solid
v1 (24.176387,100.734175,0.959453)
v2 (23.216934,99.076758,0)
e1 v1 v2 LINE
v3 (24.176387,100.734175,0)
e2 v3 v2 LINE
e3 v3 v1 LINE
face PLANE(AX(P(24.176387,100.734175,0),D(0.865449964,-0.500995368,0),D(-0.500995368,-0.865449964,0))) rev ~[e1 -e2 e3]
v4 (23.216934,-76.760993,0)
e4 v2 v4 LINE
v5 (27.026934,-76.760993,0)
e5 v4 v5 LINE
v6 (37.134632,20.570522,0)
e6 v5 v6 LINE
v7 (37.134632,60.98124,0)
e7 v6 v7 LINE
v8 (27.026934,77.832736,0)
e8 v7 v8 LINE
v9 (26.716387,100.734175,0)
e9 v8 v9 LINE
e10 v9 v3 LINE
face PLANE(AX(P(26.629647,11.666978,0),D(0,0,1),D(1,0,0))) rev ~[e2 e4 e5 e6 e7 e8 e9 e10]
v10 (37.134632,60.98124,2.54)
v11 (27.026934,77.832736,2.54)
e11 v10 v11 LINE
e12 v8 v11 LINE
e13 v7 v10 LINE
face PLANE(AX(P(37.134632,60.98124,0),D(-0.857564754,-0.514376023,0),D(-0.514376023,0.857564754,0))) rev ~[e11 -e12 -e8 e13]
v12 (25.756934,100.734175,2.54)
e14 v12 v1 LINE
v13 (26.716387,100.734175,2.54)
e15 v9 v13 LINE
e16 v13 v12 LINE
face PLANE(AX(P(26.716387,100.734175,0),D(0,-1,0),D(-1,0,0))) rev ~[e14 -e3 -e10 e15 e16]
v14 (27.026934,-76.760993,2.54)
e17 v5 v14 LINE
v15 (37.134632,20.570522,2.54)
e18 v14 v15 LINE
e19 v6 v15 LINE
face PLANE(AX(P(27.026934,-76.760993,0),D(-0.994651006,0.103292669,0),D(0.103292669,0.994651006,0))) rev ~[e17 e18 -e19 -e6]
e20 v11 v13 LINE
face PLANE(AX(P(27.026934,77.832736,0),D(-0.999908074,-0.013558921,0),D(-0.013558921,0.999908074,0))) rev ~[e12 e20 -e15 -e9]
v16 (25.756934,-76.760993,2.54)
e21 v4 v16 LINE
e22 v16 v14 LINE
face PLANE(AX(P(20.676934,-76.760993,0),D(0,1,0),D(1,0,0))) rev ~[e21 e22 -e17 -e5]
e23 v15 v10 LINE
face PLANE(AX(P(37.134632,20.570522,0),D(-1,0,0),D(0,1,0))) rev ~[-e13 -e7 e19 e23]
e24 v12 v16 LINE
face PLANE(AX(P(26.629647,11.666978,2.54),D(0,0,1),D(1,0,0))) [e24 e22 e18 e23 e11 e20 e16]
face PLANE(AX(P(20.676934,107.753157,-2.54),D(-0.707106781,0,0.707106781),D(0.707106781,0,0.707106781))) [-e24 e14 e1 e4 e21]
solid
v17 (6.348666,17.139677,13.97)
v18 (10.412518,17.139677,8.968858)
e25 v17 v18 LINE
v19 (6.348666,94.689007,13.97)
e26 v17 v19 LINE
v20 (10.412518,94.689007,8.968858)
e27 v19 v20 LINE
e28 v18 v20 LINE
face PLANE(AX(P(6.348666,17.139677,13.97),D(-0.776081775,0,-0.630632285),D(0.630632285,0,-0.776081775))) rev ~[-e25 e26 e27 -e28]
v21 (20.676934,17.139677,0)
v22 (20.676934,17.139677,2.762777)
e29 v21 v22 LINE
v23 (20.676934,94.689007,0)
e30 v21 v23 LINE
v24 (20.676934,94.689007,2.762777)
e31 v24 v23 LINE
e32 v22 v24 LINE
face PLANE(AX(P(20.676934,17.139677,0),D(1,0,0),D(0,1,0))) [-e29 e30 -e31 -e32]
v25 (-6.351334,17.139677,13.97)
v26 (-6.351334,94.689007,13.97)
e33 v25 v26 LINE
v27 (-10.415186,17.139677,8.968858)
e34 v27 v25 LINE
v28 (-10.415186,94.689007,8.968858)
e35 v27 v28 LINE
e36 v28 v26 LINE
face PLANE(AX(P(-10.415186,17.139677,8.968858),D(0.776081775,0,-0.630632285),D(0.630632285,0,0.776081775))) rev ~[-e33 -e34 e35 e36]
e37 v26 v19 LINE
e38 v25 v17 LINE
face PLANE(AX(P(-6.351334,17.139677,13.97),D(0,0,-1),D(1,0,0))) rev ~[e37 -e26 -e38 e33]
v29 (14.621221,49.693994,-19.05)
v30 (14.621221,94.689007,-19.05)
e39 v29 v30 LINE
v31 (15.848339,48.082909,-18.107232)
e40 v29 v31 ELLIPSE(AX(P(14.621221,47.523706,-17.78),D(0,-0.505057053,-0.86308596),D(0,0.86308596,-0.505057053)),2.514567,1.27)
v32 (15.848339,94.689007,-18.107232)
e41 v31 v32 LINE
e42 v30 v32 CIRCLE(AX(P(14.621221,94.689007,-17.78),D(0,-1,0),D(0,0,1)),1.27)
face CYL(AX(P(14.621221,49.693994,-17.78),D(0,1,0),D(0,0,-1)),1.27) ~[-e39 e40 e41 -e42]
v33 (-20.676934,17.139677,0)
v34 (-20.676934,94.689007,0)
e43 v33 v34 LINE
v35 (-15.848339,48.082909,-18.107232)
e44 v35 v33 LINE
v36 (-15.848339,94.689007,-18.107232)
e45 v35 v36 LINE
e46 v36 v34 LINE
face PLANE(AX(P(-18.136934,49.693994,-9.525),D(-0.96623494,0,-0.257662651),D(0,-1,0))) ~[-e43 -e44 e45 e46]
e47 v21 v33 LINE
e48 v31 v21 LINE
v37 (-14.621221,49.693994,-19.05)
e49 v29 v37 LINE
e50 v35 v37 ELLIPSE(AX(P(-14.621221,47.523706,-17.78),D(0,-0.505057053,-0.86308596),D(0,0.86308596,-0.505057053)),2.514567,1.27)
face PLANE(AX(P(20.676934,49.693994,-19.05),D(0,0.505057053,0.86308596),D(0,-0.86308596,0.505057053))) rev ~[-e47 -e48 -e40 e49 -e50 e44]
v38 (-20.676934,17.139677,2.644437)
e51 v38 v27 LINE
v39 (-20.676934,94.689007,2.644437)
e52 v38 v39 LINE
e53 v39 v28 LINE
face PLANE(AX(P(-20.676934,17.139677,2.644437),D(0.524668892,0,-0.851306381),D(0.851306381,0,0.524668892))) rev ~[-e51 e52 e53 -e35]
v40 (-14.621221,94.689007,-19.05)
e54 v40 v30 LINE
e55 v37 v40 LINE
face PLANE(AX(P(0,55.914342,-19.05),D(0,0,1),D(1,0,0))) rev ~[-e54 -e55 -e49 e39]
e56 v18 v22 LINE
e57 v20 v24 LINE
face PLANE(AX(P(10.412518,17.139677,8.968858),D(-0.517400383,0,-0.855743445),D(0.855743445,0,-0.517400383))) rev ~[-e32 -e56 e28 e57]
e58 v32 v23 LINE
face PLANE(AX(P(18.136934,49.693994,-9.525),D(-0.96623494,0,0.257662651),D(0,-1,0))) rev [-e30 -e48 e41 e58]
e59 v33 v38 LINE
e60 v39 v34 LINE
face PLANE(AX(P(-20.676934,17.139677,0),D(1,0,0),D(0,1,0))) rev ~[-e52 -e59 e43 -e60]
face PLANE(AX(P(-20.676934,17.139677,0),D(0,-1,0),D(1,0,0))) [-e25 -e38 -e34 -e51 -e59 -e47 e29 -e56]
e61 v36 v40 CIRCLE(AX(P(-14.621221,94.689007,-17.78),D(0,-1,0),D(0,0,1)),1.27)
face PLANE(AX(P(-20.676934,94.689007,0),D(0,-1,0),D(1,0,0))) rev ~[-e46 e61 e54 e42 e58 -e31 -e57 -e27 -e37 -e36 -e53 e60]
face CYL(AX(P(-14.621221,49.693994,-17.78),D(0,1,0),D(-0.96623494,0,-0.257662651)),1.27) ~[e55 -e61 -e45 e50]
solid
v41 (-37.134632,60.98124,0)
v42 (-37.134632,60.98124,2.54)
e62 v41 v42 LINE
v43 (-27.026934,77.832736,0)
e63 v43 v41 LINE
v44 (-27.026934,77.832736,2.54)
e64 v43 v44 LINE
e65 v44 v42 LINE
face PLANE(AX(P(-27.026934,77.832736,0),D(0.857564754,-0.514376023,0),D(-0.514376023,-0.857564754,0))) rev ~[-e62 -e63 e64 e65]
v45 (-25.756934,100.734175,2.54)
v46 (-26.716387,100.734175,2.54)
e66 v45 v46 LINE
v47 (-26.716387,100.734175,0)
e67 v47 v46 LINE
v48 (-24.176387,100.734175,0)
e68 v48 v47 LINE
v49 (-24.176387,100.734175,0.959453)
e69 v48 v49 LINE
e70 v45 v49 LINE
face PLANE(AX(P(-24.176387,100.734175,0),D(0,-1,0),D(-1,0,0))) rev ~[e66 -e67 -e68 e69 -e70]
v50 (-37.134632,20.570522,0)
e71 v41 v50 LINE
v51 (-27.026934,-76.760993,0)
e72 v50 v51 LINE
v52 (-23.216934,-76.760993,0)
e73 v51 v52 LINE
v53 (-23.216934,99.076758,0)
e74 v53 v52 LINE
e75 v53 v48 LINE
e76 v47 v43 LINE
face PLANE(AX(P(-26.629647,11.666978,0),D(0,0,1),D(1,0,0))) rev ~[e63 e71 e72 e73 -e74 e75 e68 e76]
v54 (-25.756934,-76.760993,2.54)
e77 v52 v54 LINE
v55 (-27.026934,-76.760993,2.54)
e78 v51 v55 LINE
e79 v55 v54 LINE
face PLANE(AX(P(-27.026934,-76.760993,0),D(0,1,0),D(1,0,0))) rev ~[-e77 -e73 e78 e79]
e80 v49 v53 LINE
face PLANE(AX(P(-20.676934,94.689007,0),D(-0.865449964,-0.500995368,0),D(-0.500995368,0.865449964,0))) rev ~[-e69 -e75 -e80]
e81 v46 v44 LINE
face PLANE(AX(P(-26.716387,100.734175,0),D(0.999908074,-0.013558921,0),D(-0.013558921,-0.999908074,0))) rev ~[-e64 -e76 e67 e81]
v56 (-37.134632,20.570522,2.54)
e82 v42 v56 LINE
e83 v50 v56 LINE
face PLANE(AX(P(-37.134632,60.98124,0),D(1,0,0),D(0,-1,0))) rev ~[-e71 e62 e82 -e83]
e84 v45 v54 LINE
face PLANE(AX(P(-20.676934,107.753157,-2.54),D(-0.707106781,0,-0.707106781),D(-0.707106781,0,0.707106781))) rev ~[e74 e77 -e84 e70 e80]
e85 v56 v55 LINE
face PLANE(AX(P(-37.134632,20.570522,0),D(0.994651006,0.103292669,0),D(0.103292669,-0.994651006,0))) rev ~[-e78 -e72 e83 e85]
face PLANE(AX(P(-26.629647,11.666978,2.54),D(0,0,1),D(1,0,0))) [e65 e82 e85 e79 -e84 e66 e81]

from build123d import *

# Parameters (mm, degrees)
F1_DEPTH       = 2.54
F2_W           = 41.3538680857
F2_H           = 77.5493303561
F3_DEPTH       = 19.05
F5_DEPTH       = 41.656
F6_SIZE2       = 19.05
F6_SIZE        = 5.08
F7_R           = 1.27
F9_DEPTH       = 83.595498357
F10_T1_DEPTH   = 197.5782991577
F10_2_T1_DEPTH = 197.5782991577


# Not quite as in the source:
# - a fillet or chamfer that OpenCascade refuses, or shapes differently, is made with other operations: its cross-section is extruded or revolved along the edge and cut away or added


with BuildPart() as f1:
    # F0 (on Top) → F1 (new body)
    with BuildSketch(Plane.XY):
        Polygon((-37.1346319619, 20.5705222299), (-27.0269340429, -76.7609926856), (-20.6769340429, -76.7609926856), (-20.6769340429, 94.6890073144), (-24.1763866916, 100.7341753154), (-26.7163866916, 100.7341753154), (-27.0269340429, 77.8327360749), (-37.1346319619, 60.9812401235), align=None)
    extrude(amount=F1_DEPTH)

    # F10#2: chamfer of 5.08 on 1 edges, made by hand

    # F10_2_s2 → F10_2_t1 (cut)
    with BuildSketch(Plane.XZ.offset(-107.7531568933)):
        Polygon((-20.6769340429, -2.54), (-25.7569340429, 2.54), (-20.6769340429, 2.54), align=None)
    extrude(amount=F10_2_T1_DEPTH, mode=Mode.SUBTRACT)


with BuildPart() as f1b:
    # F0 (on Top) → F1, piece 2 (new body)
    with BuildSketch(Plane.XY):
        Polygon((27.0269340429, 77.8327360749), (26.7163866916, 100.7341753154), (24.1763866916, 100.7341753154), (20.6769340429, 94.6890073144), (20.6769340429, -76.7609926856), (27.0269340429, -76.7609926856), (37.1346319619, 20.5705222299), (37.1346319619, 60.9812401235), align=None)
    extrude(amount=F1_DEPTH)

    # F10: chamfer of 5.08 on 1 edges, made by hand

    # F10_s2 → F10_t1 (cut)
    with BuildSketch(Plane.XZ.offset(-107.7531568933)):
        Polygon((20.6769340429, -2.54), (25.7569340429, 2.54), (20.6769340429, 2.54), align=None)
    extrude(amount=F10_T1_DEPTH, mode=Mode.SUBTRACT)


with BuildPart() as f3:
    # F2 (on Top) → F3 (new body, symmetric)
    with BuildSketch(Plane.XY):
        with Locations((0, 55.9143421364)):
            Rectangle(F2_W, F2_H)
    extrude(amount=F3_DEPTH, both=True)

    # F4 (on face) → F5 (cut)
    with BuildSketch(Plane.YZ.offset(20.6769340429)):
        Polygon((49.6939942241, -19.05), (17.1396769583, 0), (17.1396769583, -19.05), align=None)
    extrude(amount=-F5_DEPTH, mode=Mode.SUBTRACT)

    # F6
    f6_edges = [f3.edges().sort_by_distance(p)[0] for p in [
        (20.676934, 72.191501, -19.05),
        (-20.676934, 72.191501, -19.05),
    ]]
    f6_side = f3.faces().sort_by_distance((0, 72.191501, -19.05))[0]
    chamfer(f6_edges, length=F6_SIZE, length2=F6_SIZE2, reference=f6_side)

    # F7
    f7_edges = [f3.edges().sort_by_distance(p)[0] for p in [
        (15.596934, 72.191501, -19.05),
        (-15.596934, 72.191501, -19.05),
    ]]
    fillet(f7_edges, radius=F7_R)

    # F8 (on face) → F9 (cut, through all)
    with BuildSketch(Plane.XZ.offset(-17.1396769583)):
        Polygon((-20.6769340429, 19.05), (-20.6769340429, 2.6444371324), (-10.4151861742, 8.9688580483), (-6.3513340429, 13.97), (6.3486659571, 13.97), (10.4125180885, 8.9688580483), (20.6769340429, 2.762777498), (20.6769340429, 19.05), align=None)
    extrude(amount=-F9_DEPTH, mode=Mode.SUBTRACT)


solid = Compound([f1.part, f1b.part, f3.part])
